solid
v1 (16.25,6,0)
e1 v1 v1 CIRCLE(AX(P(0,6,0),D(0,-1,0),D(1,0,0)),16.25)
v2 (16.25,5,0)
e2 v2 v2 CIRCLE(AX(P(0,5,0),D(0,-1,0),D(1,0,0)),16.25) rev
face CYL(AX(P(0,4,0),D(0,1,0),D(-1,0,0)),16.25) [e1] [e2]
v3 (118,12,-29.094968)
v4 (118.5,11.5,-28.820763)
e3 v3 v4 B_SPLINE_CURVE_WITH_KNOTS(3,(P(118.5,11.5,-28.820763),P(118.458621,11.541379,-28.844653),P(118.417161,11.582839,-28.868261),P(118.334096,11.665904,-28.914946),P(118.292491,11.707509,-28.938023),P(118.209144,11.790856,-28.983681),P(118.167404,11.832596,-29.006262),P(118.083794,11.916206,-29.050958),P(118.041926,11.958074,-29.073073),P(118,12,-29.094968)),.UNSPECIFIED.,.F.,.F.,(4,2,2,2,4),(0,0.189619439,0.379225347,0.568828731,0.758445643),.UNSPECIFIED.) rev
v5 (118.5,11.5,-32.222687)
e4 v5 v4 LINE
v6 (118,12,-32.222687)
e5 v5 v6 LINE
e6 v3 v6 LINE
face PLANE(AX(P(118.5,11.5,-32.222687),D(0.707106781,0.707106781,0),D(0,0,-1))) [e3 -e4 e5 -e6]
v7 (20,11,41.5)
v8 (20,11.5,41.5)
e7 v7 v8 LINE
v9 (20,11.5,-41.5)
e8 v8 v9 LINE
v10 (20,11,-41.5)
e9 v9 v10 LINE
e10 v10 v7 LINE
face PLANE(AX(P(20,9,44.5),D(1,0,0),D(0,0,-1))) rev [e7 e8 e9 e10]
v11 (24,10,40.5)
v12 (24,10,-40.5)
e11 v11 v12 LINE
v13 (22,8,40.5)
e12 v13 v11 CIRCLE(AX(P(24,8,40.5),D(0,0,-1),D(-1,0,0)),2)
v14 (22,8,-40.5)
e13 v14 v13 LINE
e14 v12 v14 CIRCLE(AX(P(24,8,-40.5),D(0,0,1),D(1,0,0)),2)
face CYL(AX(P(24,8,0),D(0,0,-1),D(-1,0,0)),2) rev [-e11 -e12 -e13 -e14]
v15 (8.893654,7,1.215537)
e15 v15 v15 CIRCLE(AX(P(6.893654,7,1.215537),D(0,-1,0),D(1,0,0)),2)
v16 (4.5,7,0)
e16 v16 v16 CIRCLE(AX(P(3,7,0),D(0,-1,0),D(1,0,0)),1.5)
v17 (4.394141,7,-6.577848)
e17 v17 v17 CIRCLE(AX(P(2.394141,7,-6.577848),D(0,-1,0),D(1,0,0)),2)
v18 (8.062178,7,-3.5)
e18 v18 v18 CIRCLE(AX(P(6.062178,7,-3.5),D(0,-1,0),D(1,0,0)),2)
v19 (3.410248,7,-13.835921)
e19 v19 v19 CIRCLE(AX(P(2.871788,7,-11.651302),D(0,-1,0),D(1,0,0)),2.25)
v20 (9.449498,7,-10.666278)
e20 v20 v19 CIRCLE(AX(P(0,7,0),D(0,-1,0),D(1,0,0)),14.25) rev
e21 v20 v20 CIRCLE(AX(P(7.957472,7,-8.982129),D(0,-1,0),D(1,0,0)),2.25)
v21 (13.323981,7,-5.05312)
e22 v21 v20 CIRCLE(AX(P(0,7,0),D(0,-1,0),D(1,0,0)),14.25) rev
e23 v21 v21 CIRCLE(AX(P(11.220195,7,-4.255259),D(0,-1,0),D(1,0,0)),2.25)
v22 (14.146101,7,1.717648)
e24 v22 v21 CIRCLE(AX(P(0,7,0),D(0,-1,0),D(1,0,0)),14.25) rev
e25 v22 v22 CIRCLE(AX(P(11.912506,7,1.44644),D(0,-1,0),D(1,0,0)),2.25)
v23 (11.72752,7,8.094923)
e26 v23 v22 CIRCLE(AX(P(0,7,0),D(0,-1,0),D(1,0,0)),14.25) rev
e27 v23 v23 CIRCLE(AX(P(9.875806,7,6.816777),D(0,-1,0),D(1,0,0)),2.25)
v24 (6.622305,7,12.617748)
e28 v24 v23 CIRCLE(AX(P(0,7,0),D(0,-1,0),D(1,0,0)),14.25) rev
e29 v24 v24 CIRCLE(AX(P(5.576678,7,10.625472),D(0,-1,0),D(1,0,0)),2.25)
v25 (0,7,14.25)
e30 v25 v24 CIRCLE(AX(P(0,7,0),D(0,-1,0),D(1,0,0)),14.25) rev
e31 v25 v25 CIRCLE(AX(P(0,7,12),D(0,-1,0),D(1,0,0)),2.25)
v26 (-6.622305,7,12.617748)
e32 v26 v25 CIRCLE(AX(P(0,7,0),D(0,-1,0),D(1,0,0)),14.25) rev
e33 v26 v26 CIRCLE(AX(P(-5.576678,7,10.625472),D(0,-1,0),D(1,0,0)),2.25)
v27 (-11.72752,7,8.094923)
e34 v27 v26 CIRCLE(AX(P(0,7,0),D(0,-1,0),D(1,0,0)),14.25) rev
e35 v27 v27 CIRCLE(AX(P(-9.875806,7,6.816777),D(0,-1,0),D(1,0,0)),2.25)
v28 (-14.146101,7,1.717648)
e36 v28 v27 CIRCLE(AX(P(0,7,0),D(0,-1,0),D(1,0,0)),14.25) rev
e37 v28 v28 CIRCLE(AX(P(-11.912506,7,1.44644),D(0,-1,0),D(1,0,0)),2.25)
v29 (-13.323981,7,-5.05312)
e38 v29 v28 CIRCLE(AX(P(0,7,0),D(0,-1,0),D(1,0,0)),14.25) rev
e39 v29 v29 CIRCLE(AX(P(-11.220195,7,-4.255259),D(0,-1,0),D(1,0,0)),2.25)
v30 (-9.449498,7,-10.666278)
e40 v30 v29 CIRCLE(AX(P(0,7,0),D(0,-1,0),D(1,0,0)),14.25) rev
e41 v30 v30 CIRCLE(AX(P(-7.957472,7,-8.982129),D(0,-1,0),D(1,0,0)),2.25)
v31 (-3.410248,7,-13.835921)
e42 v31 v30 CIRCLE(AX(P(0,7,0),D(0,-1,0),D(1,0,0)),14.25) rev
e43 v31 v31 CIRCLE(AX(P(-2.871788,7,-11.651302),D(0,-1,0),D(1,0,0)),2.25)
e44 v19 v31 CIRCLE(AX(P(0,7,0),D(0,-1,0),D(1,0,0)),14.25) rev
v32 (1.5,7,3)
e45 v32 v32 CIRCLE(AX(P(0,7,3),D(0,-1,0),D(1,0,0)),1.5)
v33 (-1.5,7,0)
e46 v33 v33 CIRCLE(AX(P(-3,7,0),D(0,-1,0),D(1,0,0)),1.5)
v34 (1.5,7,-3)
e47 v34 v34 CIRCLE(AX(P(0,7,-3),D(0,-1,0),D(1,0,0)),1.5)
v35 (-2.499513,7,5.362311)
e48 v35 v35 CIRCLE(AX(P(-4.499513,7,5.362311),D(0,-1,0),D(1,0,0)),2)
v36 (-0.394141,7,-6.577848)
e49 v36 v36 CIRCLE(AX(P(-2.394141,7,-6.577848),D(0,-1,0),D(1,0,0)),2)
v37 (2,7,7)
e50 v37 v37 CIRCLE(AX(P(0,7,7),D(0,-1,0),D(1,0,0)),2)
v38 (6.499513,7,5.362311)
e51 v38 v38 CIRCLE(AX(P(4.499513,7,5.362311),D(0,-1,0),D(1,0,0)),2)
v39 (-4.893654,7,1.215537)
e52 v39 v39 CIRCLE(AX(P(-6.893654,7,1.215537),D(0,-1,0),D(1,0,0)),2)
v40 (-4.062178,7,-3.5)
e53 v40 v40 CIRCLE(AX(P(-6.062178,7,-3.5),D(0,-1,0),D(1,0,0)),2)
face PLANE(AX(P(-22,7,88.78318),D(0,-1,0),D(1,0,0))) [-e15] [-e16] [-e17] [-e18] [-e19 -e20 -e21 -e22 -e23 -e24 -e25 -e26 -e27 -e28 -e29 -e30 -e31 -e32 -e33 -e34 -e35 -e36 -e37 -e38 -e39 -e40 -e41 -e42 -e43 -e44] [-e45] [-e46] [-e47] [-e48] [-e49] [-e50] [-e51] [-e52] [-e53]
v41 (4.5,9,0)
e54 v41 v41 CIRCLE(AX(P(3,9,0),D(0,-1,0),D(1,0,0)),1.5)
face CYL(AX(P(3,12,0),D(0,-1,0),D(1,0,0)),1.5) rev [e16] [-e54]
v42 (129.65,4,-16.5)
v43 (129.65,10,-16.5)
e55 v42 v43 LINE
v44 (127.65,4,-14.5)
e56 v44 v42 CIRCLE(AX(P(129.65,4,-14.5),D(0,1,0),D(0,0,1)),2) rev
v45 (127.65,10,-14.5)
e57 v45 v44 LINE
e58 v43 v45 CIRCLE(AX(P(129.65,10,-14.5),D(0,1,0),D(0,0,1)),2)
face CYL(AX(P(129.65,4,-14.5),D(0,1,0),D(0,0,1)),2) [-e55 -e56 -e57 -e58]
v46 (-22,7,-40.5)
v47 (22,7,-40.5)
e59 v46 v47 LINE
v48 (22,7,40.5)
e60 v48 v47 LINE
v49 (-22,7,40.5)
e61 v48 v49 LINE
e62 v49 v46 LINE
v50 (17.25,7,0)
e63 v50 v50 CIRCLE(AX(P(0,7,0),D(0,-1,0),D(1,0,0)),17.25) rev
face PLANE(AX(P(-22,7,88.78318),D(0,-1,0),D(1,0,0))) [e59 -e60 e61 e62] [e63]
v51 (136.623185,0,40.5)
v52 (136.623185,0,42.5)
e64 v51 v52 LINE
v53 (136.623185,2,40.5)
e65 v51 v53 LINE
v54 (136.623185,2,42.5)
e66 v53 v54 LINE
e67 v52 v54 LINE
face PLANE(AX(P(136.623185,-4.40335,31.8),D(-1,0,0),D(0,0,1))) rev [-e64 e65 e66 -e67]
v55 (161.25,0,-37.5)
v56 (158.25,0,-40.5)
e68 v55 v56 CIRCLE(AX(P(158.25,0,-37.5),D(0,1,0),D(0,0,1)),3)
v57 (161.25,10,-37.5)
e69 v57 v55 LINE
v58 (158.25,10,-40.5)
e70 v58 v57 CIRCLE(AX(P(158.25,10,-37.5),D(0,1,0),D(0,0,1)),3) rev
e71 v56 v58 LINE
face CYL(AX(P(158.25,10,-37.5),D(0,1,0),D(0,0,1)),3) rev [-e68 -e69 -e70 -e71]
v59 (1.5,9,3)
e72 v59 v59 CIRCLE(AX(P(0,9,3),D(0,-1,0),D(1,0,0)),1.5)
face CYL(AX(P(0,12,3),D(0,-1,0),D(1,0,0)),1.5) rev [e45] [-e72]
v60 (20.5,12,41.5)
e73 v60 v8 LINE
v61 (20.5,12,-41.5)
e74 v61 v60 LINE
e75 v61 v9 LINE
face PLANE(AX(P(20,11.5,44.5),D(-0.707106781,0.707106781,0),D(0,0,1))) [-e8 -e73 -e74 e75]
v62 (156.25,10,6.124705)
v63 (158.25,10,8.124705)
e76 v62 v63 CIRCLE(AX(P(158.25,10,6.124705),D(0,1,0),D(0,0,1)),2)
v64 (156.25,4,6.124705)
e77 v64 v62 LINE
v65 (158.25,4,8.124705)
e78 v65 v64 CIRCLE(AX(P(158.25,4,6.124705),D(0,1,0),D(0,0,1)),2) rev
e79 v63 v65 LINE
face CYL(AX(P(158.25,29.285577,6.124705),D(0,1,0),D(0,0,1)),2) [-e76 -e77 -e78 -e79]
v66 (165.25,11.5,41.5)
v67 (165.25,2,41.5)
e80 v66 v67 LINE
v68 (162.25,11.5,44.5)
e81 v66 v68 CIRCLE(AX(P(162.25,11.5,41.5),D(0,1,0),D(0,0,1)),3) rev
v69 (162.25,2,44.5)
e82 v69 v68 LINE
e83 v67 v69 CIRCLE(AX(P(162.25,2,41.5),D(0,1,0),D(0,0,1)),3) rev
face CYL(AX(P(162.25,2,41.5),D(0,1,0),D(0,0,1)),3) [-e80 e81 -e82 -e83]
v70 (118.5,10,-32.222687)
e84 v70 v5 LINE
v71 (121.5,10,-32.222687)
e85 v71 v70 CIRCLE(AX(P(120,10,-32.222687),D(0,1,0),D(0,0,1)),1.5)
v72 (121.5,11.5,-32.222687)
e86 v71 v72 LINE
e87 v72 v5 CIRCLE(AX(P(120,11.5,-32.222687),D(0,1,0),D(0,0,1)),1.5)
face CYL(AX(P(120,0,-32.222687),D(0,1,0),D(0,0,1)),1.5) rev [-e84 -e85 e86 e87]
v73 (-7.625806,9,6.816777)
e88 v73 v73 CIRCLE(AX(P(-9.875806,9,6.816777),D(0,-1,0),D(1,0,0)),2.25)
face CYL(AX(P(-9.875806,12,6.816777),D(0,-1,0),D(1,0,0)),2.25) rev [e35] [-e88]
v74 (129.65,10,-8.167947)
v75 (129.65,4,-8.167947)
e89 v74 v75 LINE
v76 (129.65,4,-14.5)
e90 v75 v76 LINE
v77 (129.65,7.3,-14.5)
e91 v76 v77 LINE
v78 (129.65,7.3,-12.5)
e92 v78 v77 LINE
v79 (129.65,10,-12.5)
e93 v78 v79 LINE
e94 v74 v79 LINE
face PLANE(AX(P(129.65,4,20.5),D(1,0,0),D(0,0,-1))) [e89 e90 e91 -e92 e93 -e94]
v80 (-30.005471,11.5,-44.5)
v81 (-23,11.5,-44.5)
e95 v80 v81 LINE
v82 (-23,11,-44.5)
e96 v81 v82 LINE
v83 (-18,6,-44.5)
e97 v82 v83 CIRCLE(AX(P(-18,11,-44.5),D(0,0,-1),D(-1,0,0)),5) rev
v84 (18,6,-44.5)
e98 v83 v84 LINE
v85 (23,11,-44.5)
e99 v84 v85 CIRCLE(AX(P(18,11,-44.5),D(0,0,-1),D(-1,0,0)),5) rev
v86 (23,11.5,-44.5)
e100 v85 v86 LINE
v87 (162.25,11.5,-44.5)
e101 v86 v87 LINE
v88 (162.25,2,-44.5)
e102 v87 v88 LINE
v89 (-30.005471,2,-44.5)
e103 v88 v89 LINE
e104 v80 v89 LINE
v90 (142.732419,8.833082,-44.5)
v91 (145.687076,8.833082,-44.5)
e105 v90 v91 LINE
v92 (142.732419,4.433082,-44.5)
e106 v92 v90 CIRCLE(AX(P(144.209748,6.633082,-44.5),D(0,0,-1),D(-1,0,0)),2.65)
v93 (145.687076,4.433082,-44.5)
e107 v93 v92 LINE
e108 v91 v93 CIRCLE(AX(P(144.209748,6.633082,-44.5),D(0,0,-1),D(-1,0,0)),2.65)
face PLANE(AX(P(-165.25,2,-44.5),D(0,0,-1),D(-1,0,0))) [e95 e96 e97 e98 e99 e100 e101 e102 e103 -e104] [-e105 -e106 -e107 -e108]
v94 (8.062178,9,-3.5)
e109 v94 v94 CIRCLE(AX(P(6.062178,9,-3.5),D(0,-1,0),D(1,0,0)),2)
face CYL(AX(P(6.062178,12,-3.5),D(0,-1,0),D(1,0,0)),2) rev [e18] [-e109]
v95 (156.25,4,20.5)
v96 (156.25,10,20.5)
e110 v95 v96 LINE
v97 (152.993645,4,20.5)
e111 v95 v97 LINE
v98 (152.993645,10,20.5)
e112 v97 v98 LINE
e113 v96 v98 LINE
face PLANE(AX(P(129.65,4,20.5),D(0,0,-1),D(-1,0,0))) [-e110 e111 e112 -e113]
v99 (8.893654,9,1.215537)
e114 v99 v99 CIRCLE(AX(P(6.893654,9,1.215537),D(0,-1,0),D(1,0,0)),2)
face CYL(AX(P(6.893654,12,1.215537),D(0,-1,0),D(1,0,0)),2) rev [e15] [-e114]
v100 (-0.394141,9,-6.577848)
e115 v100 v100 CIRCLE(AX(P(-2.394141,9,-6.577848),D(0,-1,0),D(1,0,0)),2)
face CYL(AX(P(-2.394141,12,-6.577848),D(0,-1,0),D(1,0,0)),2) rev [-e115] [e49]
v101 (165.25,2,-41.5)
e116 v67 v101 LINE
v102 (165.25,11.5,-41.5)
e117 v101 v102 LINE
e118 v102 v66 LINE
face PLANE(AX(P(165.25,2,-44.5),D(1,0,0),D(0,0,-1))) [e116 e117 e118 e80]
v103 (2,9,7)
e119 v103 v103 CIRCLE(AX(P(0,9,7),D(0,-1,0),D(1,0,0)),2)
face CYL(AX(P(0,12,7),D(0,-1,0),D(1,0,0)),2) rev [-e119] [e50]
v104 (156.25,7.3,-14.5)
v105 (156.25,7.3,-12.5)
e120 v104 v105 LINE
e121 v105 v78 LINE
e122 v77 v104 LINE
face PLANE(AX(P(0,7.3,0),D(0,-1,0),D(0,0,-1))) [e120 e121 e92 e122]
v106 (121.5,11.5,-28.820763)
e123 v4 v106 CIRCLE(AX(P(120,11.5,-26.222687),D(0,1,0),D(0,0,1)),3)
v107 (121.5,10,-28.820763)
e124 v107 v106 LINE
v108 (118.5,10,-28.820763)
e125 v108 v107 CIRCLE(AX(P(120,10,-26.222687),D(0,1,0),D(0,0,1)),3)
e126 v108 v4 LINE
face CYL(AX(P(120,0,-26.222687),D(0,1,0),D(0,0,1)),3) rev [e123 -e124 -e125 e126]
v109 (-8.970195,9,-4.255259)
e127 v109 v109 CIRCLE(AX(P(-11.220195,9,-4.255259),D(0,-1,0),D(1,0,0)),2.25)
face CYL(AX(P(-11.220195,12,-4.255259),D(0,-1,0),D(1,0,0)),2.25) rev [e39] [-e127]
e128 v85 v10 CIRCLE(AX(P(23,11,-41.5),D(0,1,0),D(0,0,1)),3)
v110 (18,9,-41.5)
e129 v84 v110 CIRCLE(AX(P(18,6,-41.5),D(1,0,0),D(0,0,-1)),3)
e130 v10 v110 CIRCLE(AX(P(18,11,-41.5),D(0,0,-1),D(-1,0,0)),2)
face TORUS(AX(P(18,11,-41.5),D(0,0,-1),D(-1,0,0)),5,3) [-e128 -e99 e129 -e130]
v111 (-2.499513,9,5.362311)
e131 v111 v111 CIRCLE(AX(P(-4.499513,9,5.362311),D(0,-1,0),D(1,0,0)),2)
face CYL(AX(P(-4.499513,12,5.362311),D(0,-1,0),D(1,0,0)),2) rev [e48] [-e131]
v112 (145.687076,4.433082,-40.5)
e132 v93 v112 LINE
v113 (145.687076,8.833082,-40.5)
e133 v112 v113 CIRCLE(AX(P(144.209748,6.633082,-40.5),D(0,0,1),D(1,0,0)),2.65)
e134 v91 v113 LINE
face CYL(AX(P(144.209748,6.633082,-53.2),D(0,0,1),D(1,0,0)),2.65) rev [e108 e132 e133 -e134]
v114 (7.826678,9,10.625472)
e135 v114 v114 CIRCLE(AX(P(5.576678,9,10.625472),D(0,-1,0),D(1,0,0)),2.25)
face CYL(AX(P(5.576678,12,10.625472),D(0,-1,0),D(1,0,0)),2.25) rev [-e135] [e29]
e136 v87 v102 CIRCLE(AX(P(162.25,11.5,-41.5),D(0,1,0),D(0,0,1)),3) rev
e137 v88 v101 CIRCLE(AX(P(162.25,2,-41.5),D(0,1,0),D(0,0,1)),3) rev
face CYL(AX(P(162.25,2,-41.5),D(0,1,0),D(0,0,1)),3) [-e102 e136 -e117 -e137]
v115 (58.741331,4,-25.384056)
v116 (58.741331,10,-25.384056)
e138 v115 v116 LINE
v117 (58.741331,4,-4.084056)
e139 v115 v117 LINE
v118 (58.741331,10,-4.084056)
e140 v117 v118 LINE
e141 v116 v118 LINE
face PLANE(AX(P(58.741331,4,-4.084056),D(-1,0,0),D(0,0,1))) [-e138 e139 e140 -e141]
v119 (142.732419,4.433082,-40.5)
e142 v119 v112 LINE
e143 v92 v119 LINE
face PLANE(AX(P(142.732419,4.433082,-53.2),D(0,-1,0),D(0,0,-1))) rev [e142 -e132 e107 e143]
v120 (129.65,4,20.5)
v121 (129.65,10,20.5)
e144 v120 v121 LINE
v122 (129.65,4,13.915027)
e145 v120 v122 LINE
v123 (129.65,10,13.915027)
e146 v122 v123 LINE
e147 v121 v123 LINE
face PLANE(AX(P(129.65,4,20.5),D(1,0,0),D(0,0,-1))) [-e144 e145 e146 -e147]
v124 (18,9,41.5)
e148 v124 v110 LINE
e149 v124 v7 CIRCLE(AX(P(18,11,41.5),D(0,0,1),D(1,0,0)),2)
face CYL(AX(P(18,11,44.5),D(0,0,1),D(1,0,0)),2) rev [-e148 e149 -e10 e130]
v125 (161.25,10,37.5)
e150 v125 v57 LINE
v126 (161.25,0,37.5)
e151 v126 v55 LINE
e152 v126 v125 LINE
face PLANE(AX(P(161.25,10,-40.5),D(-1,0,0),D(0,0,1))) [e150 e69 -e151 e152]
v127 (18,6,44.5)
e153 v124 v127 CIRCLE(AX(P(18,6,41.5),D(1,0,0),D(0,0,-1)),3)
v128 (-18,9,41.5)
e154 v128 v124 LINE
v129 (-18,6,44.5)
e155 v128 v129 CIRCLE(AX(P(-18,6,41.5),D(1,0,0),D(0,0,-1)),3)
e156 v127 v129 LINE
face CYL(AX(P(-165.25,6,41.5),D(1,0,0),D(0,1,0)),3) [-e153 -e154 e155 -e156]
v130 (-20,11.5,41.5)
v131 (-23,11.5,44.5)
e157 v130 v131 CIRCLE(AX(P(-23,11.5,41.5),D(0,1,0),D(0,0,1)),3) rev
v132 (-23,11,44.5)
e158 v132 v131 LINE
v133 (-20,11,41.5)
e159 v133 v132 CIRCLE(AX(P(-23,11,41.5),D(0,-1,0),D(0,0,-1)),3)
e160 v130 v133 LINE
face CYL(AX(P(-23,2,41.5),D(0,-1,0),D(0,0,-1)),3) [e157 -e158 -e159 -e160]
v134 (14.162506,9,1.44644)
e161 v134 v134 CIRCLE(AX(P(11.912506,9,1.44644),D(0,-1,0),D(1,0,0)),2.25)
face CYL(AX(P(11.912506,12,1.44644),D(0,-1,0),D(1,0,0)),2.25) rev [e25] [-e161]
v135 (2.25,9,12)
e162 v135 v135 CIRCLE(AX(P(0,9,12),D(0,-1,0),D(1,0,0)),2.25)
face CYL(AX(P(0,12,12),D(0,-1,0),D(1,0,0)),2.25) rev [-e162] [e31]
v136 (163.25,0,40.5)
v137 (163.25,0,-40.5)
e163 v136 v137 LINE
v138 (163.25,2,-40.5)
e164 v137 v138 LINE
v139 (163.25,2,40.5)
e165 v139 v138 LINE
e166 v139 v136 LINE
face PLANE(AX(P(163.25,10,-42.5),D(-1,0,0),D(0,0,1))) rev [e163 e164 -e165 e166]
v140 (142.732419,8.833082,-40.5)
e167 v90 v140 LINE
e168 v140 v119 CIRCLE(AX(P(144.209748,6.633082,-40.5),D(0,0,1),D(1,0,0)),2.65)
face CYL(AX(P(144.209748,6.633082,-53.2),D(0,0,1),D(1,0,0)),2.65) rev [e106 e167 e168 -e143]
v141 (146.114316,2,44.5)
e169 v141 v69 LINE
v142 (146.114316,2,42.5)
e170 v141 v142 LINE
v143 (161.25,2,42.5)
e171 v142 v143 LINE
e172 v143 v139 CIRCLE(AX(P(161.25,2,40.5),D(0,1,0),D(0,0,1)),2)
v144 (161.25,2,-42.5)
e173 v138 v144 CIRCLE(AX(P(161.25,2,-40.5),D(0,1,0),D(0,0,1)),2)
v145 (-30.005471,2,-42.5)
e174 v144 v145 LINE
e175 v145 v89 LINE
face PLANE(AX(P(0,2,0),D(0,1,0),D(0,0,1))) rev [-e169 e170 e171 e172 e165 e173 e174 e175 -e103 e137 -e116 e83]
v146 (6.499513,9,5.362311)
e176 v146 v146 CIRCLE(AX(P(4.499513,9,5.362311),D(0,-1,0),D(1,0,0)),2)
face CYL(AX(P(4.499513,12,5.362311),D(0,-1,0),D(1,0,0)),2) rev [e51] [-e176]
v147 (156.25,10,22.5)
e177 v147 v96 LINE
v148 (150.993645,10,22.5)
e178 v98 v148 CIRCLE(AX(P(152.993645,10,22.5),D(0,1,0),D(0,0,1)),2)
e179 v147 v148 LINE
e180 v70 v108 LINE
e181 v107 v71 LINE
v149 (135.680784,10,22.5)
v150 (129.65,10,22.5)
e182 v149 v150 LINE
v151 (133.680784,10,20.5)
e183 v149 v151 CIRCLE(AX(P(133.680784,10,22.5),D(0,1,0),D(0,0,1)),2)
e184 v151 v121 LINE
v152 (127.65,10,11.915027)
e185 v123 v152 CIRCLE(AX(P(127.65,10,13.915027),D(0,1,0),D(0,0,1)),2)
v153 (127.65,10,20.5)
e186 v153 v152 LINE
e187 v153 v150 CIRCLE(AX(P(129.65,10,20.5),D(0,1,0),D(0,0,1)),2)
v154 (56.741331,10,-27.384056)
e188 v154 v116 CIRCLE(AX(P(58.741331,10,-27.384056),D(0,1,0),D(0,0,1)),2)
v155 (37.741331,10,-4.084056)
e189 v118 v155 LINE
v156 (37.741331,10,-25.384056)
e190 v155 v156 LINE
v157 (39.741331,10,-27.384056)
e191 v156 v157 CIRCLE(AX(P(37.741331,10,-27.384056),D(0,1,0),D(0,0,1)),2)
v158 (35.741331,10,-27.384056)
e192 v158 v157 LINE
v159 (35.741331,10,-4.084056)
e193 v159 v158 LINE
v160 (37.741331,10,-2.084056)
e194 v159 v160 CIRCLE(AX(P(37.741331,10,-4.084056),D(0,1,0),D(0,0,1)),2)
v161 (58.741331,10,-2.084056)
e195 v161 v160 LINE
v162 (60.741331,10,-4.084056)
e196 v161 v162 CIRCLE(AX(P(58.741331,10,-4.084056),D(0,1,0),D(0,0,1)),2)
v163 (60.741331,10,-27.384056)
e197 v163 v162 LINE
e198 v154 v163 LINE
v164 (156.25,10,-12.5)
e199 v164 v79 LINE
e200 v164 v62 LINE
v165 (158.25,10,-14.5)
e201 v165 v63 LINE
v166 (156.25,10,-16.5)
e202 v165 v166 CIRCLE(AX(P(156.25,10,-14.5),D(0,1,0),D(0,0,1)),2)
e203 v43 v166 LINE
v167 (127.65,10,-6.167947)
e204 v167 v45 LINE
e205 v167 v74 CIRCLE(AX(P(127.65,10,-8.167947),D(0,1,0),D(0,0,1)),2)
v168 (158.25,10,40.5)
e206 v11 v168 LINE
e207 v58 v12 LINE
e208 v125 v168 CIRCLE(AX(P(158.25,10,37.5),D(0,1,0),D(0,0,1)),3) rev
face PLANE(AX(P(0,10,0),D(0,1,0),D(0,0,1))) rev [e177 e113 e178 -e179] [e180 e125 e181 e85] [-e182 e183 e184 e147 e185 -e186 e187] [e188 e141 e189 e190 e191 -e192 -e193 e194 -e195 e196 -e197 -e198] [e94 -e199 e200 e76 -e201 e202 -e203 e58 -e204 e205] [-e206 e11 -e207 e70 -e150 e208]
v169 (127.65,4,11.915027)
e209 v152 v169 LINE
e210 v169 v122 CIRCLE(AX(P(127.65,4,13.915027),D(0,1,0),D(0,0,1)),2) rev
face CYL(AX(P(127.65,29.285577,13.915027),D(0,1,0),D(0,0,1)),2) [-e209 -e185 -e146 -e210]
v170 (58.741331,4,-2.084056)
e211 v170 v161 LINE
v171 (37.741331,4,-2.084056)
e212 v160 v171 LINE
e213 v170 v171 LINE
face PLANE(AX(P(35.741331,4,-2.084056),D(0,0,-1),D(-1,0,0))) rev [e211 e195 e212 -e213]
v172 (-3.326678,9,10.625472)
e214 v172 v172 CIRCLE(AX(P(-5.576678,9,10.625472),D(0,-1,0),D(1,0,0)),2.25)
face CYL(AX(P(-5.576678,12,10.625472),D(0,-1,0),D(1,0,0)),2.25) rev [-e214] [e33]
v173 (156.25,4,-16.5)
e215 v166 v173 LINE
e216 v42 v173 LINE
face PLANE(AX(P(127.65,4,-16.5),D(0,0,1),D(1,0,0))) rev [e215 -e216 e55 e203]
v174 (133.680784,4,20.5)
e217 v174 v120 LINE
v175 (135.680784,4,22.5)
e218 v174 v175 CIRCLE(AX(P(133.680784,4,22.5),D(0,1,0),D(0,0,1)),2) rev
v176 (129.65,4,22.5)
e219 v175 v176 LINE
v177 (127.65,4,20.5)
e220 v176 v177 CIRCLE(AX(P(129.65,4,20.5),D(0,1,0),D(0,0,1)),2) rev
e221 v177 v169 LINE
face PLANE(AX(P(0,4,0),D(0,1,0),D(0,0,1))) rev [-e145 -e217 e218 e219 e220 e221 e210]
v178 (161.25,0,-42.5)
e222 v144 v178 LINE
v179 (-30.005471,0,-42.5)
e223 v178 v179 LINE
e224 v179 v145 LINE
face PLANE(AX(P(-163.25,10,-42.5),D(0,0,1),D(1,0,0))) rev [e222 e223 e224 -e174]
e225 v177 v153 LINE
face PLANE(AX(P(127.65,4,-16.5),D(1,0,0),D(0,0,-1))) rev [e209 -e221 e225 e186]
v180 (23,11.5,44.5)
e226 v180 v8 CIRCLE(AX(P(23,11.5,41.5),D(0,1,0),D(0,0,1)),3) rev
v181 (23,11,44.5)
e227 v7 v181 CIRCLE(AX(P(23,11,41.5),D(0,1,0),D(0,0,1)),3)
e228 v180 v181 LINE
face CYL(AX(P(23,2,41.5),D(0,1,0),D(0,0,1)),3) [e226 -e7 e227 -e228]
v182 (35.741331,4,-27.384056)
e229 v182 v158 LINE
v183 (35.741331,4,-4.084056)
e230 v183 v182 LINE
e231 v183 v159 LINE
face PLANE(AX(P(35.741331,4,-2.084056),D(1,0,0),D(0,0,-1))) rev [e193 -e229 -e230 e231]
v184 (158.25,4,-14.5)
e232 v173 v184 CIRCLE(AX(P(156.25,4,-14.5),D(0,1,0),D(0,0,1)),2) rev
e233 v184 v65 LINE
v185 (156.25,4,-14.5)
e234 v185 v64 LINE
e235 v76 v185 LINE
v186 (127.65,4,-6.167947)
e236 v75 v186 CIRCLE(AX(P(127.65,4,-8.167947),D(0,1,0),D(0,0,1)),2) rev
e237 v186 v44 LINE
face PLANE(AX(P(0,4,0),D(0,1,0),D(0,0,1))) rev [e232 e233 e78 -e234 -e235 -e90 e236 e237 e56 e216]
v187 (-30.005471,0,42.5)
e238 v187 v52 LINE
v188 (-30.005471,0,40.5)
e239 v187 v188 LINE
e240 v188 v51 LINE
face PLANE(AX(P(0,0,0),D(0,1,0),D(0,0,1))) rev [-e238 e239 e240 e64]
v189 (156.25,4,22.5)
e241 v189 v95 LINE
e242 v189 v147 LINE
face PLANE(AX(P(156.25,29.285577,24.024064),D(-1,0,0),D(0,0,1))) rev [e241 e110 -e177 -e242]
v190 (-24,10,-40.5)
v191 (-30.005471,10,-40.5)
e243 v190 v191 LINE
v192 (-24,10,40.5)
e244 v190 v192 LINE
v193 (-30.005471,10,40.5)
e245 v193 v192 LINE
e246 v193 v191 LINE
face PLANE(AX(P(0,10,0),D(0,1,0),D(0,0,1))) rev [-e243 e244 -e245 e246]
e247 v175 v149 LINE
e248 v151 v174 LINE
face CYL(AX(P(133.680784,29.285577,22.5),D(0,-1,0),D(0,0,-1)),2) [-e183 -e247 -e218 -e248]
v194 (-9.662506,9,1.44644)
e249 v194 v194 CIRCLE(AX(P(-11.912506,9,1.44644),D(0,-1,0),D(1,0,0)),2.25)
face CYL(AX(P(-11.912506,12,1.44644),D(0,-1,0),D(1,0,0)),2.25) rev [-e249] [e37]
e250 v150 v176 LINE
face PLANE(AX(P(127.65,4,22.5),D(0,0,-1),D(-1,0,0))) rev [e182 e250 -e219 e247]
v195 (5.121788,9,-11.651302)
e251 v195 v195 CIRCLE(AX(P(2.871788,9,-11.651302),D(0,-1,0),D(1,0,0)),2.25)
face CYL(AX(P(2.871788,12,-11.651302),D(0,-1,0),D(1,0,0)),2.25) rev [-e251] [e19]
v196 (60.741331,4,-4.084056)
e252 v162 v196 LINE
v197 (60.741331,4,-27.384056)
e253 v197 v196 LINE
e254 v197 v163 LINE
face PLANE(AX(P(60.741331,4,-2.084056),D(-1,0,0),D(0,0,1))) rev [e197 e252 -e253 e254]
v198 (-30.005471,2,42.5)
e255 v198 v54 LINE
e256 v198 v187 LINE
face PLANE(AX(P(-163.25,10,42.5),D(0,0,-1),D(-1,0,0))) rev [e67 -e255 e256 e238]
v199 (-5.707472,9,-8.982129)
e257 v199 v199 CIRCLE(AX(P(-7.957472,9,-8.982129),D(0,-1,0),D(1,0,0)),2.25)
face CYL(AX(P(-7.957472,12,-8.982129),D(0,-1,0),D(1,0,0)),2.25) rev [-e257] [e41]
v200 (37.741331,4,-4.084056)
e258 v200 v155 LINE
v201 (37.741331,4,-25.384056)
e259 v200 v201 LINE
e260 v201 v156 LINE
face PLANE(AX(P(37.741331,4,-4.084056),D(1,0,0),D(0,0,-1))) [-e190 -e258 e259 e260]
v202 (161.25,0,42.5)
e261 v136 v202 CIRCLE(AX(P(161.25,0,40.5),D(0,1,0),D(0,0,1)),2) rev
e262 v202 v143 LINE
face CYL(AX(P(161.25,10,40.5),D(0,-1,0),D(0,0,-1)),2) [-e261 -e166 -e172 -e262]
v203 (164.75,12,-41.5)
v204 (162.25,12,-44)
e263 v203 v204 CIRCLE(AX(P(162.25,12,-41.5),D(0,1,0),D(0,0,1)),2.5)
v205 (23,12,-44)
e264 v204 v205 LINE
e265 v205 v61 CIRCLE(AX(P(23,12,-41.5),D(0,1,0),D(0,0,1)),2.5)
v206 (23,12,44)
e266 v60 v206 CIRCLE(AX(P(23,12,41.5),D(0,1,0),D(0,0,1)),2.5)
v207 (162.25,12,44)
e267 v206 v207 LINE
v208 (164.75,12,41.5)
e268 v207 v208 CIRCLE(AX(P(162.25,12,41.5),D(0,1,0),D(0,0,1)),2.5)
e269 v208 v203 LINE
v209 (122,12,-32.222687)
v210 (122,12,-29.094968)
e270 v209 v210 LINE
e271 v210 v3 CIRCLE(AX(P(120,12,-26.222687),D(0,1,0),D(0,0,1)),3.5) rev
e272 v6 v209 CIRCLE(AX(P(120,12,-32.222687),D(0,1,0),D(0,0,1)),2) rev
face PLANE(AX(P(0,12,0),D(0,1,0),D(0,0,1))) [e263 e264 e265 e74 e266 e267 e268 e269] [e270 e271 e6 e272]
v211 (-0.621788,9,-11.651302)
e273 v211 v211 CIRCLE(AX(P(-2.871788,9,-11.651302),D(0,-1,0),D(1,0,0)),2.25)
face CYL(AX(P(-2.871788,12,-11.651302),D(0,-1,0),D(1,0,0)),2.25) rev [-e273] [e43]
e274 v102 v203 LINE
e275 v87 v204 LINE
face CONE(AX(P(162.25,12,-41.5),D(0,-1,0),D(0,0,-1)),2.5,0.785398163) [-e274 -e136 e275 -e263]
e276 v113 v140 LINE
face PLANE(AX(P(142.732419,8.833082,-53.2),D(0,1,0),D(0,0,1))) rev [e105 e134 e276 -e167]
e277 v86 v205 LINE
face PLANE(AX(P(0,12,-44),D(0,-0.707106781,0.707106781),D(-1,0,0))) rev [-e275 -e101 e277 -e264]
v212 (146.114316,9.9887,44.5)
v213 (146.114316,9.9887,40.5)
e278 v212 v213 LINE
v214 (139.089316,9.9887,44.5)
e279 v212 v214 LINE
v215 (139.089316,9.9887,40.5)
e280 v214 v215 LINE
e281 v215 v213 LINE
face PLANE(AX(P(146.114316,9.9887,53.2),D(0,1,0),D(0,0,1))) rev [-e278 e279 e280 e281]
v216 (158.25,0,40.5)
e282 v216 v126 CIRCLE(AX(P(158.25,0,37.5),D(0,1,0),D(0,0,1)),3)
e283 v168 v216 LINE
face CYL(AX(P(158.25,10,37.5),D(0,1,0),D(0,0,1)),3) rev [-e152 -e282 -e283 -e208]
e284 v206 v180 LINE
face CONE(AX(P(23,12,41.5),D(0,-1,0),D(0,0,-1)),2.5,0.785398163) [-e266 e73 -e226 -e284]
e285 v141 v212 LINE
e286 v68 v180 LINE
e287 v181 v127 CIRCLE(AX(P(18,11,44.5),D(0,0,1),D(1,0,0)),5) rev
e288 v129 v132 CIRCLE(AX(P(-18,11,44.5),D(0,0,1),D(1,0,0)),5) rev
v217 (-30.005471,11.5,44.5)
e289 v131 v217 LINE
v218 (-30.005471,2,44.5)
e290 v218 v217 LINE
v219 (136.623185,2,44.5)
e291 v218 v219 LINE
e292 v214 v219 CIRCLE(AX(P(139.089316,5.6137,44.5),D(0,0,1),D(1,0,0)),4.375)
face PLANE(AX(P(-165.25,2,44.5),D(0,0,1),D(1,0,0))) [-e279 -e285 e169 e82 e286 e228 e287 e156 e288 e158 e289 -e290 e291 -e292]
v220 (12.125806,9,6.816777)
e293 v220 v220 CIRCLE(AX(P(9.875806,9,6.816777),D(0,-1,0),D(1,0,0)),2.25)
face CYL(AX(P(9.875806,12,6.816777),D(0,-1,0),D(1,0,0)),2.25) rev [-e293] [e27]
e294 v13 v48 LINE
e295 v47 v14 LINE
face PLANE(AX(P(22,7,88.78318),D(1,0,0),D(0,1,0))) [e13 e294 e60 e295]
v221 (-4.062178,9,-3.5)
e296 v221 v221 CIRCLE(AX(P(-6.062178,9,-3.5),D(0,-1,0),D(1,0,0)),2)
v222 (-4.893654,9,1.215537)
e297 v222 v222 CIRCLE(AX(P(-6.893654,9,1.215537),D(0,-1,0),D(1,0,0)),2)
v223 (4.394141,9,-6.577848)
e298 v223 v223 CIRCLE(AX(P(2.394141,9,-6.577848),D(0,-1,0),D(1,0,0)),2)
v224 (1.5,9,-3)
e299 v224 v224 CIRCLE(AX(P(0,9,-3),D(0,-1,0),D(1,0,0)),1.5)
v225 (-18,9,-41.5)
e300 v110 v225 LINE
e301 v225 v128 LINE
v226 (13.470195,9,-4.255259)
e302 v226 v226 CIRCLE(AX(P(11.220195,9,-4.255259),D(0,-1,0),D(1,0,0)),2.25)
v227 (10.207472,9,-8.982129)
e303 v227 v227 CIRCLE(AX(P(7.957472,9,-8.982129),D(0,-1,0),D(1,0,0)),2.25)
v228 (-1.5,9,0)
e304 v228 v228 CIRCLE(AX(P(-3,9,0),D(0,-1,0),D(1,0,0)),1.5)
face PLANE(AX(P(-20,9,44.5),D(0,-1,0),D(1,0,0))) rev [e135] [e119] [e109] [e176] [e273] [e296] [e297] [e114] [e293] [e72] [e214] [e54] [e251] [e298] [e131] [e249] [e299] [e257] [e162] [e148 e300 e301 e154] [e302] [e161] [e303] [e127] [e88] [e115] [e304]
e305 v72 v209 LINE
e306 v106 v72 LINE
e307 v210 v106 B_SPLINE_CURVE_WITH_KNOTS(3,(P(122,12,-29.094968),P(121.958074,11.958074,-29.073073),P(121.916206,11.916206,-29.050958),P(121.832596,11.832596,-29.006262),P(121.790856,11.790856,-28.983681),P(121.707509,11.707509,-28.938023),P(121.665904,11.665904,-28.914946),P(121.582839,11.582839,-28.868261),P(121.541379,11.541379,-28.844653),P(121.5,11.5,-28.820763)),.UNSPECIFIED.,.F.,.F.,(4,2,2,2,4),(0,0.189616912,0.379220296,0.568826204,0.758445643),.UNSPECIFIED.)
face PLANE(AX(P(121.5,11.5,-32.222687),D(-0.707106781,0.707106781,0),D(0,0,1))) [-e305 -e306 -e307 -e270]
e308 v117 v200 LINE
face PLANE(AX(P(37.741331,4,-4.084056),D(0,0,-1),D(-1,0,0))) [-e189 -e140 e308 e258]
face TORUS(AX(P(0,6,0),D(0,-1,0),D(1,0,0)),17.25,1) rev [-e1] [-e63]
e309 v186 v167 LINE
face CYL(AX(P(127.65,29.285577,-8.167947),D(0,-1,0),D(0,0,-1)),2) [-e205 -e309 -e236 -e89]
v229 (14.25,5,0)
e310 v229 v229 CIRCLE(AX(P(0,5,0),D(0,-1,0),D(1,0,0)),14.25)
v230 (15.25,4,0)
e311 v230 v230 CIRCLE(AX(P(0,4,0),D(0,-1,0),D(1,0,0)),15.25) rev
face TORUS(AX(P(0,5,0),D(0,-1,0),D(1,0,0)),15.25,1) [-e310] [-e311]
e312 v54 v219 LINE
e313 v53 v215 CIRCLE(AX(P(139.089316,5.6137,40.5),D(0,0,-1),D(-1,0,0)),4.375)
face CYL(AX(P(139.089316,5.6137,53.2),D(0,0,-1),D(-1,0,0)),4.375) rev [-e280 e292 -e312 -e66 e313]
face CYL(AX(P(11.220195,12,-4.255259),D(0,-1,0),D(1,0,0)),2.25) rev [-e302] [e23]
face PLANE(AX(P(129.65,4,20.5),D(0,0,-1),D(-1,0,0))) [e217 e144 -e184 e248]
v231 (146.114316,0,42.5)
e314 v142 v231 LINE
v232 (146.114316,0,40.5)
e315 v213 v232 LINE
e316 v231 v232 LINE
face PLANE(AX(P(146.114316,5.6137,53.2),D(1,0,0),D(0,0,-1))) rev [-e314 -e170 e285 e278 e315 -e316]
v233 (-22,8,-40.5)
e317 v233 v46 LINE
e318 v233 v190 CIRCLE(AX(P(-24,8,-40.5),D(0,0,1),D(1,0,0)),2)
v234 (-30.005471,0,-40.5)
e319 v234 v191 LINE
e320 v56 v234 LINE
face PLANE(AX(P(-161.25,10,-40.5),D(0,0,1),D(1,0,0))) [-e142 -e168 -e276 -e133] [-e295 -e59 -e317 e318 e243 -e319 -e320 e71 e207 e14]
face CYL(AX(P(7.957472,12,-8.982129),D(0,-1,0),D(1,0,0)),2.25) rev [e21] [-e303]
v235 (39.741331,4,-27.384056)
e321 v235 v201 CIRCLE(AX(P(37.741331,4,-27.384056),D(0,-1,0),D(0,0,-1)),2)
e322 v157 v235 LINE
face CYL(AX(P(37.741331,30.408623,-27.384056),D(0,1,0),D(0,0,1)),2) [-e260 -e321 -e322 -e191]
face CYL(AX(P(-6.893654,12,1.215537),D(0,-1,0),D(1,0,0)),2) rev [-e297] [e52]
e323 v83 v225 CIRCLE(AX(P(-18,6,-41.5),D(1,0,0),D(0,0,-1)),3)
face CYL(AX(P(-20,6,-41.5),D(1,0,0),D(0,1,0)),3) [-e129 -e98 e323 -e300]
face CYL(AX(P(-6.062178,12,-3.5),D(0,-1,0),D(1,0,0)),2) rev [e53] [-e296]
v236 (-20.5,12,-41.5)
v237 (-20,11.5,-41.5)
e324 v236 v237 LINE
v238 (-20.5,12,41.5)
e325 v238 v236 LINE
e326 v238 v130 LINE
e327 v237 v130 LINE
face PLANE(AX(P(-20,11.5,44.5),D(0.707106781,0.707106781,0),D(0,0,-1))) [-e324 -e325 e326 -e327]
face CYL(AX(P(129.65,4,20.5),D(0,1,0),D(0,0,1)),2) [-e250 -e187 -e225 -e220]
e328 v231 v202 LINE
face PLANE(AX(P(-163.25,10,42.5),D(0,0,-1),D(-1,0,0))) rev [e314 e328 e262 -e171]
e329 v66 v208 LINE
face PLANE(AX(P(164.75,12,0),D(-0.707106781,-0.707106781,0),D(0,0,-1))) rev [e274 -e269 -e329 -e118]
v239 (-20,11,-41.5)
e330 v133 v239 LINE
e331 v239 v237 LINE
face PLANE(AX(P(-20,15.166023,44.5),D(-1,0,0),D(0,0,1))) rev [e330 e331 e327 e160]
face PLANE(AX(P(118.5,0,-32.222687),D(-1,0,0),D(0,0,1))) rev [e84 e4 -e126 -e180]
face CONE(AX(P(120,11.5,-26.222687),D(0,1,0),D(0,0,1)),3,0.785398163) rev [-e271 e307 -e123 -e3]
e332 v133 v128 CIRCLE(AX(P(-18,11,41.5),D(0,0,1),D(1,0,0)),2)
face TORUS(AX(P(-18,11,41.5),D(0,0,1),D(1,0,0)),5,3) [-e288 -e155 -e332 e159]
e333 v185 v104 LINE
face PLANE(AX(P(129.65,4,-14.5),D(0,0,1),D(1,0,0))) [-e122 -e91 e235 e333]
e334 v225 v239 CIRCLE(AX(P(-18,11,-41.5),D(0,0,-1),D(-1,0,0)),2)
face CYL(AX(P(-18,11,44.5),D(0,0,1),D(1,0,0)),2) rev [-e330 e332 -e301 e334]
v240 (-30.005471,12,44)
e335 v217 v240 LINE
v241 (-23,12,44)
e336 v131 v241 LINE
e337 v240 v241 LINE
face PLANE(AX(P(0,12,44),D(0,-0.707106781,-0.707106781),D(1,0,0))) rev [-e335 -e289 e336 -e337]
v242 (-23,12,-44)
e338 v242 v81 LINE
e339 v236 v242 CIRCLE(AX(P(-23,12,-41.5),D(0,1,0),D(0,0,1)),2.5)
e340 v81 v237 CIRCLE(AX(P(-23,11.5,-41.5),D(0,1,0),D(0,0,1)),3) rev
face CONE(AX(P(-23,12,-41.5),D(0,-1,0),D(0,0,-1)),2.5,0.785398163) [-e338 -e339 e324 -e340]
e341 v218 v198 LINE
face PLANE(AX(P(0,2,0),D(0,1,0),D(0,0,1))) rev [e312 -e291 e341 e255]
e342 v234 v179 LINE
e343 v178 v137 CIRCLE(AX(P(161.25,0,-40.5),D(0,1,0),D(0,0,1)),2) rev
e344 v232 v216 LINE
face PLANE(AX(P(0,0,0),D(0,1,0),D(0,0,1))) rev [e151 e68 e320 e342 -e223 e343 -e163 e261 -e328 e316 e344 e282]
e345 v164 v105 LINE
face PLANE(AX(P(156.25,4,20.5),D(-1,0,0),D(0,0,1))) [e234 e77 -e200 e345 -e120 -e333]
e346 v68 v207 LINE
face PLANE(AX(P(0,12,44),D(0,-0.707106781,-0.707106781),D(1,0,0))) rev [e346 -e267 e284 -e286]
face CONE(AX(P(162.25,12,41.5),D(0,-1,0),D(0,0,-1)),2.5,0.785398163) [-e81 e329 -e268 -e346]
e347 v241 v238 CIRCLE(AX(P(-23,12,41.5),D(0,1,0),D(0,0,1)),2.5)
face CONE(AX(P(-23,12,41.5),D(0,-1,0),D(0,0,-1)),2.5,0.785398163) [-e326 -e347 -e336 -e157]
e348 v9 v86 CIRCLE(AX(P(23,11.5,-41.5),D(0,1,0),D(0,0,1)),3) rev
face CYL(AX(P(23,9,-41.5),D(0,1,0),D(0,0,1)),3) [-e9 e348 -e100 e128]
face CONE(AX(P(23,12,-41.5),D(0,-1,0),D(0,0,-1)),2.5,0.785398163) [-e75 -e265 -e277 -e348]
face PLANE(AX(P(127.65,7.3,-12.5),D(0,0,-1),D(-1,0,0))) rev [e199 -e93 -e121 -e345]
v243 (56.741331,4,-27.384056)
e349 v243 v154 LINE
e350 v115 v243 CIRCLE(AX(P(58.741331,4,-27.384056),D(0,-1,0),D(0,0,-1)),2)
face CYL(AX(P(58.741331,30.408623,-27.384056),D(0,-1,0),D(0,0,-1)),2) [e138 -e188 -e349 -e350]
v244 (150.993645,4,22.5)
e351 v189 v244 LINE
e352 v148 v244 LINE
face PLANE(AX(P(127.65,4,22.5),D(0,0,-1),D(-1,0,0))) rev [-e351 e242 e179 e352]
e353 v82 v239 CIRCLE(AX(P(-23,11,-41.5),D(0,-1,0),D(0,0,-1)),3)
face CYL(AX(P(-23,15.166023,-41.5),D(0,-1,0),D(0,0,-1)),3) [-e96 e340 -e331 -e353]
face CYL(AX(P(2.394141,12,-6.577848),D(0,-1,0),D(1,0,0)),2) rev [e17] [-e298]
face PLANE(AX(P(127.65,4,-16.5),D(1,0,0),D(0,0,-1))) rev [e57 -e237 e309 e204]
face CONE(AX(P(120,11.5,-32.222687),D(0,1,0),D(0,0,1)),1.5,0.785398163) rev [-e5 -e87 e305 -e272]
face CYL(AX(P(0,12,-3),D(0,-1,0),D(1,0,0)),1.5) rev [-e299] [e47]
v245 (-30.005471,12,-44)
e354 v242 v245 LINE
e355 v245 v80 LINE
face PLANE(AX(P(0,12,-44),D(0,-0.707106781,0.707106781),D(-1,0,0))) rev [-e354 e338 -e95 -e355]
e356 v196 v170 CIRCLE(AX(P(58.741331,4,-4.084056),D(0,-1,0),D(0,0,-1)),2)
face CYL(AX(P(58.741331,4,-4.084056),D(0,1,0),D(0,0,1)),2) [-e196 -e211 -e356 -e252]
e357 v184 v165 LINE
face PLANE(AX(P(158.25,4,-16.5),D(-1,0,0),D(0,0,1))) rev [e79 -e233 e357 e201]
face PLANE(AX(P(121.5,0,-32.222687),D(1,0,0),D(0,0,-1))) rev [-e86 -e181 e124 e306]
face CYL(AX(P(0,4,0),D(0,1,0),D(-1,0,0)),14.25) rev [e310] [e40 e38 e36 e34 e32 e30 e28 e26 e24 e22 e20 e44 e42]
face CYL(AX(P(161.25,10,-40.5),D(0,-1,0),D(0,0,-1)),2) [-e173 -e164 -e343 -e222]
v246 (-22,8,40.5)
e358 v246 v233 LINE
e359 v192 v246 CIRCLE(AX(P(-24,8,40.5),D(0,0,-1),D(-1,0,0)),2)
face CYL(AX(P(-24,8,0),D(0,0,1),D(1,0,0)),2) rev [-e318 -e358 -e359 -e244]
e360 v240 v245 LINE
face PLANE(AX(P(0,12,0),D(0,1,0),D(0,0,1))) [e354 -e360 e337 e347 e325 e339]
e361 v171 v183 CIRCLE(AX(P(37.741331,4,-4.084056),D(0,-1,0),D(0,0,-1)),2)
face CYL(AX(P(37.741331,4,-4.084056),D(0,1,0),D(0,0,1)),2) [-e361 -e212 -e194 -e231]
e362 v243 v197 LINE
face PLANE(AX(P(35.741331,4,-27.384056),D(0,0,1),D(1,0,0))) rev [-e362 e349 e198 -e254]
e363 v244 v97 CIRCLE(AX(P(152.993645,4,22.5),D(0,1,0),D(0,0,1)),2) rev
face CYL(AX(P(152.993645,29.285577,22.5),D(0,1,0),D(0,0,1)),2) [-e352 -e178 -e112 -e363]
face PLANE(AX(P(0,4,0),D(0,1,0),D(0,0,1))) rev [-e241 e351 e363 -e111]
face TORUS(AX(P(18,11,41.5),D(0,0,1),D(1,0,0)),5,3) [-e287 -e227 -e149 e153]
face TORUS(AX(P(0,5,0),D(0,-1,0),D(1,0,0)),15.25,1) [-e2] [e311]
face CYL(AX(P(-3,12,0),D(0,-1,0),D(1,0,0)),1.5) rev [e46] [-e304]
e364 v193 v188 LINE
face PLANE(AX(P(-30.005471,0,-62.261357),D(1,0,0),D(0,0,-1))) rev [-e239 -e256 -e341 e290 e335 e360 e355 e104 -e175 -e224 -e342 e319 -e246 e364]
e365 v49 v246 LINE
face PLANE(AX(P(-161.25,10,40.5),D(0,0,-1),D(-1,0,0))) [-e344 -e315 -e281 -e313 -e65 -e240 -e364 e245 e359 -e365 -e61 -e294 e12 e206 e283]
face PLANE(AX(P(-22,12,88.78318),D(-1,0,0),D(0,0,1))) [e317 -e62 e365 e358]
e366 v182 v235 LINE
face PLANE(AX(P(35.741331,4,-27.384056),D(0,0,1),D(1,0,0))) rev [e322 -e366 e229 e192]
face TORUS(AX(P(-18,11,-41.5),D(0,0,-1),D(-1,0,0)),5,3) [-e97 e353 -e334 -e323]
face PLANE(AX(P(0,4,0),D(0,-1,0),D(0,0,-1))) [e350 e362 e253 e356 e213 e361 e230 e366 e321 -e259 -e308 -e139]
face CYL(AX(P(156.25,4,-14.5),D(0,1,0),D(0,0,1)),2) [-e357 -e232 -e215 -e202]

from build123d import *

# Parameters (mm, degrees)
SKETCH1_W           = 326.5
SKETCH1_H           = 85
SKETCH1_W_2         = 322.5
SKETCH1_H_2         = 81
BOSS_EXTRUDE1_DEPTH = 10
SKETCH2_W           = 330.5
SKETCH2_H           = 89
SKETCH2_W_2         = 322.5
SKETCH2_H_2         = 81
BOSS_EXTRUDE2_DEPTH = 8
SKETCH3_W           = 330.5
SKETCH3_H           = 89
BOSS_EXTRUDE3_DEPTH = 2
FILLET1_R           = 3
FILLET2_R           = 2
FILLET3_R           = 3
CHAMFER1_SIZE       = 0.5
CUT_EXTRUDE1_DEPTH  = 172.557024047
CHAMFER2_SIZE       = 0.5
SKETCH7_W           = 40
SKETCH7_H           = 6.166023439
CUT_EXTRUDE3_DEPTH  = 189.075948755
BOSS_EXTRUDE4_REACH = 190.076
FILLET4_R           = 2
CHAMFER3_SIZE       = 0.5
FILLET5_R           = 3
FILLET6_R           = 2
SKETCH9_R           = 16.25
SKETCH9_R_2         = 14.25
BOSS_EXTRUDE5_DEPTH = 3
SKETCH10_R          = 1.5
SKETCH10_R_2        = 2
SKETCH10_R_3        = 2.25
CUT_EXTRUDE4_DEPTH  = 172.279924393
CHAMFER4_SIZE       = 0.5
SKETCH12_W          = 30.6
SKETCH12_H          = 39
SKETCH12_W_2        = 26.6
SKETCH12_H_2        = 35
BOSS_EXTRUDE6_DEPTH = 6
SKETCH13_W          = 30.6
SKETCH13_H          = 4
BOSS_EXTRUDE7_DEPTH = 2.7
SKETCH14_W          = 3.373769955
SKETCH14_H          = 15.899358316
SKETCH14_W_2        = 15.312861043
SKETCH14_H_2        = 6.106571476
SKETCH14_W_3        = 6.70369678
SKETCH14_H_3        = 18.082973575
CUT_EXTRUDE5_DEPTH  = 6
FILLET7_R           = 2
CUT_EXTRUDE6_DEPTH  = 12.7
CUT_EXTRUDE7_DEPTH  = 12.7
CUT_EXTRUDE8_DEPTH  = 12.7
SKETCH19_W          = 25
SKETCH19_H          = 25.3
SKETCH19_W_2        = 21
SKETCH19_H_2        = 21.3
BOSS_EXTRUDE8_DEPTH = 6
SKETCH20_W          = 17
SKETCH20_H          = 11.292116592
CUT_EXTRUDE9_DEPTH  = 6
FILLET8_R           = 2
FILLET9_R           = 2
FILLET10_R          = 1
SKETCH18_W          = 146.063438611
SKETCH18_H          = 131.716143141
CUT_EXTRUDE10_DEPTH = 172.557024047


with BuildPart() as part:
    # Sketch1 → Boss-Extrude1 (new body)
    with BuildSketch(Plane(origin=(0, 0, 0), x_dir=(1, 0, 0), z_dir=(0, 1, 0))):
        Rectangle(SKETCH1_W, SKETCH1_H)
        Rectangle(SKETCH1_W_2, SKETCH1_H_2, mode=Mode.SUBTRACT)
    extrude(amount=BOSS_EXTRUDE1_DEPTH)

    # Sketch2 → Boss-Extrude2 (add)
    with BuildSketch(Plane(origin=(0, 10, 0), x_dir=(1, 0, 0), z_dir=(0, 1, 0))):
        Rectangle(SKETCH2_W, SKETCH2_H)
        Rectangle(SKETCH2_W_2, SKETCH2_H_2, mode=Mode.SUBTRACT)
    extrude(amount=-BOSS_EXTRUDE2_DEPTH)

    # Sketch3 → Boss-Extrude3 (add)
    with BuildSketch(Plane(origin=(0, 10, 0), x_dir=(1, 0, 0), z_dir=(0, 1, 0))):
        Rectangle(SKETCH3_W, SKETCH3_H)
    extrude(amount=BOSS_EXTRUDE3_DEPTH)

    # Fillet1
    fillet1_edges = [part.edges().sort_by_distance(p)[0] for p in [
        (161.25, 5, 40.5),
        (161.25, 5, -40.5),
        (-161.25, 5, -40.5),
        (-161.25, 5, 40.5),
    ]]
    fillet(fillet1_edges, radius=FILLET1_R)

    # Fillet2
    fillet2_edges = [part.edges().sort_by_distance(p)[0] for p in [
        (163.25, 1, 42.5),
        (-163.25, 1, 42.5),
        (-163.25, 1, -42.5),
        (163.25, 1, -42.5),
    ]]
    fillet(fillet2_edges, radius=FILLET2_R)

    # Fillet3
    fillet3_edges = [part.edges().sort_by_distance(p)[0] for p in [
        (165.25, 7, -44.5),
        (165.25, 7, 44.5),
        (-165.25, 7, 44.5),
        (-165.25, 7, -44.5),
    ]]
    fillet(fillet3_edges, radius=FILLET3_R)

    # Chamfer1
    chamfer1_edges = [part.edges().sort_by_distance(p)[0] for p in [
        (165.25, 12, 0),
        (-165.25, 12, 0),
        (0, 12, 44.5),
        (0, 12, -44.5),
        (-164.371320344, 12, -43.621320344),
        (-164.371320344, 12, 43.621320344),
        (164.371320344, 12, 43.621320344),
        (164.371320344, 12, -43.621320344),
    ]]
    chamfer(chamfer1_edges, length=CHAMFER1_SIZE)

    # Sketch4 → Cut-Extrude1 (cut, through all)
    with BuildSketch(Plane(origin=(0, 12, 0), x_dir=(1, 0, 0), z_dir=(0, 1, 0))):
        with BuildLine():
            Line((-121.5, 32.222687085), (-121.5, 28.820763297))
            ThreePointArc((-121.5, 28.820763297), (-120, 23.222687085), (-118.5, 28.820763297))
            Line((-118.5, 28.820763297), (-118.5, 32.222687085))
            ThreePointArc((-118.5, 32.222687085), (-120, 33.722687085), (-121.5, 32.222687085))
        make_face()
        with BuildLine():
            Line((118.5, 32.222687085), (118.5, 28.820763297))
            ThreePointArc((118.5, 28.820763297), (120, 23.222687085), (121.5, 28.820763297))
            Line((121.5, 28.820763297), (121.5, 32.222687085))
            ThreePointArc((121.5, 32.222687085), (120, 33.722687085), (118.5, 32.222687085))
        make_face()
    extrude(amount=-CUT_EXTRUDE1_DEPTH, mode=Mode.SUBTRACT)

    # Chamfer2
    chamfer2_edges = [part.edges().sort_by_distance(p)[0] for p in [
        (-120, 12, -33.722687085),
        (-121.5, 12, -30.521725191),
        (-120, 12, -23.222687085),
        (-118.5, 12, -30.521725191),
        (120, 12, -33.722687085),
        (118.5, 12, -30.521725191),
        (120, 12, -23.222687085),
        (121.5, 12, -30.521725191),
    ]]
    chamfer(chamfer2_edges, length=CHAMFER2_SIZE)

    # Sketch7 → Cut-Extrude3 (cut, through all)
    with BuildSketch(Plane(origin=(0, 0, -44.5), x_dir=(-1, 0, 0), z_dir=(0, 0, -1))):
        with Locations((0, 12.083011719)):
            Rectangle(SKETCH7_W, SKETCH7_H)
    extrude(amount=-CUT_EXTRUDE3_DEPTH, mode=Mode.SUBTRACT)

    # Boss-Extrude4: up to this face of the body (flat: up to its plane)
    boss_extrude4_end = Plane(part.part.faces().sort_by_distance((0, 6.63265862, 44.5))[0])
    # Sketch8 → Boss-Extrude4 (add, up to the picked face)
    with BuildSketch(Plane(origin=(0, 0, -44.5), x_dir=(-1, 0, 0), z_dir=(0, 0, -1)), mode=Mode.PRIVATE) as boss_extrude4_sk1:
        Polygon((-20, 12), (-20, 9), (20, 9), (20, 12), (22, 12), (22, 7), (-22, 7), (-22, 12), align=None)
    boss_extrude4_tool1 = split(extrude(boss_extrude4_sk1.sketch, amount=-BOSS_EXTRUDE4_REACH, mode=Mode.PRIVATE), bisect_by=boss_extrude4_end, keep=Keep.BOTH, mode=Mode.PRIVATE)
    add(boss_extrude4_tool1.solids().sort_by(Axis((0, 8.3, -44.5), (0, 0, 1)))[0])

    # Fillet4
    fillet4_edges = [part.edges().sort_by_distance(p)[0] for p in [
        (-20, 9, 0),
        (20, 9, 0),
    ]]
    fillet(fillet4_edges, radius=FILLET4_R)

    # Chamfer3
    chamfer3_edges = [part.edges().sort_by_distance(p)[0] for p in [
        (-21, 12, 44.5),
        (21, 12, 44.5),
        (-21, 12, -44.5),
        (21, 12, -44.5),
    ]]
    chamfer(chamfer3_edges, length=CHAMFER3_SIZE - 0.0001)  # a hair under: the kernel refuses the full size

    # Fillet5
    fillet5_edges = [part.edges().sort_by_distance(p)[0] for p in [
        (20, 11.25005, 44.5),
        (19.414213562, 9.585786438, 44.5),
        (-20, 11.25005, 44.5),
        (-19.414213562, 9.585786438, 44.5),
        (20, 11.25005, -44.5),
        (19.414213562, 9.585786438, -44.5),
        (-20, 11.25005, -44.5),
        (-19.414213562, 9.585786438, -44.5),
        (0, 9, -44.5),
        (0, 9, 44.5),
    ]]
    fillet(fillet5_edges, radius=FILLET5_R)

    # Fillet6
    fillet6_edges = [part.edges().sort_by_distance(p)[0] for p in [
        (22, 10, 0),
        (-22, 10, 0),
    ]]
    fillet(fillet6_edges, radius=FILLET6_R)

    # Sketch9 → Boss-Extrude5 (add)
    with BuildSketch(Plane.XZ.offset(-7)):
        Circle(SKETCH9_R)
        Circle(SKETCH9_R_2, mode=Mode.SUBTRACT)
    extrude(amount=BOSS_EXTRUDE5_DEPTH)

    # Sketch10 → Cut-Extrude4 (cut, through all)
    with BuildSketch(Plane.XZ.offset(-7)):
        with Locations((0, 3)):
            Circle(SKETCH10_R)
        with Locations((0, 7)):
            Circle(SKETCH10_R_2)
        with Locations((0, 12)):
            Circle(SKETCH10_R_3)
        with Locations((4.499513268, 5.362311102)):
            Circle(SKETCH10_R_2)
        with Locations((6.893654271, 1.215537244)):
            Circle(SKETCH10_R_2)
        with Locations((6.062177826, -3.5)):
            Circle(SKETCH10_R_2)
        with Locations((2.394141003, -6.577848346)):
            Circle(SKETCH10_R_2)
        with Locations((-2.394141003, -6.577848346)):
            Circle(SKETCH10_R_2)
        with Locations((-6.062177826, -3.5)):
            Circle(SKETCH10_R_2)
        with Locations((-6.893654271, 1.215537244)):
            Circle(SKETCH10_R_2)
        with Locations((-4.499513268, 5.362311102)):
            Circle(SKETCH10_R_2)
        with Locations((3, 0)):
            Circle(SKETCH10_R)
        with Locations((0, -3)):
            Circle(SKETCH10_R)
        with Locations((-3, 0)):
            Circle(SKETCH10_R)
        with Locations((5.576678065, 10.625472308)):
            Circle(SKETCH10_R_3)
        with Locations((9.875806391, 6.816776961)):
            Circle(SKETCH10_R_3)
        with Locations((11.912506489, 1.446440163)):
            Circle(SKETCH10_R_3)
        with Locations((11.220194912, -4.255258645)):
            Circle(SKETCH10_R_3)
        with Locations((7.957471899, -8.982128978)):
            Circle(SKETCH10_R_3)
        with Locations((2.871787971, -11.651301809)):
            Circle(SKETCH10_R_3)
        with Locations((-2.871787971, -11.651301809)):
            Circle(SKETCH10_R_3)
        with Locations((-7.957471899, -8.982128978)):
            Circle(SKETCH10_R_3)
        with Locations((-11.220194912, -4.255258645)):
            Circle(SKETCH10_R_3)
        with Locations((-11.912506489, 1.446440163)):
            Circle(SKETCH10_R_3)
        with Locations((-9.875806391, 6.816776961)):
            Circle(SKETCH10_R_3)
        with Locations((-5.576678065, 10.625472308)):
            Circle(SKETCH10_R_3)
    extrude(amount=-CUT_EXTRUDE4_DEPTH, mode=Mode.SUBTRACT)

    # Chamfer4
    chamfer4_edges = [part.edges().sort_by_distance(p)[0] for p in [
        (-20.35666074, 12, -42.918716869),
        (-20.35666074, 12, 42.918716869),
        (-20, 12, 0),
        (20.35666074, 12, 42.918716869),
        (20.35666074, 12, -42.918716869),
        (20, 12, 0),
    ]]
    chamfer(chamfer4_edges, length=CHAMFER4_SIZE - 0.0001)  # a hair under: the kernel refuses the full size

    # Sketch12 → Boss-Extrude6 (add)
    with BuildSketch(Plane.XZ.offset(-10)):
        with Locations((142.95, 3)):
            Rectangle(SKETCH12_W, SKETCH12_H)
        with Locations((142.95, 3)):
            Rectangle(SKETCH12_W_2, SKETCH12_H_2, mode=Mode.SUBTRACT)
    extrude(amount=BOSS_EXTRUDE6_DEPTH)

    # Sketch13 → Boss-Extrude7 (add)
    with BuildSketch(Plane.XZ.offset(-10)):
        with Locations((142.95, -14.5)):
            Rectangle(SKETCH13_W, SKETCH13_H)
    extrude(amount=BOSS_EXTRUDE7_DEPTH)

    # Sketch14 → Cut-Extrude5 (cut)
    with BuildSketch(Plane.XZ.offset(-4)):
        with Locations((157.936884978, 16.074384573)):
            Rectangle(SKETCH14_W, SKETCH14_H)
        with Locations((143.337214565, 21.464137582)):
            Rectangle(SKETCH14_W_2, SKETCH14_H_2)
        with Locations((129.195604024, 2.873540073)):
            Rectangle(SKETCH14_W_3, SKETCH14_H_3)
    extrude(amount=-CUT_EXTRUDE5_DEPTH, mode=Mode.SUBTRACT)

    # Fillet7
    fillet7_edges = [part.edges().sort_by_distance(p)[0] for p in [
        (150.993645086, 7, 20.5),
        (135.680784043, 7, 20.5),
        (129.65, 7, 11.91502686),
        (156.25, 7, 8.124705415),
        (129.65, 7, -6.167946715),
    ]]
    fillet(fillet7_edges, radius=FILLET7_R - 0.0001)  # a hair under: the kernel refuses the full size

    # Sketch15 → Cut-Extrude6 (cut)
    with BuildSketch(Plane.XY.offset(-40.5)):
        with BuildLine():
            Line((142.732418969, 8.83308219), (145.68707631, 8.83308219))
            ThreePointArc((145.68707631, 8.83308219), (146.85974764, 6.63308219), (145.68707631, 4.43308219))
            Line((145.68707631, 4.43308219), (142.732418969, 4.43308219))
            ThreePointArc((142.732418969, 4.43308219), (141.55974764, 6.63308219), (142.732418969, 8.83308219))
        make_face()
    extrude(amount=-CUT_EXTRUDE6_DEPTH, mode=Mode.SUBTRACT)

    # Sketch16 → Cut-Extrude7 (cut)
    with BuildSketch(Plane(origin=(0, 0, 40.5), x_dir=(-1, 0, 0), z_dir=(0, 0, -1))):
        with BuildLine():
            Line((-146.114315764, 9.98869973), (-139.089315764, 9.98869973))
            ThreePointArc((-139.089315764, 9.98869973), (-134.714315764, 5.61369973), (-139.089315764, 1.23869973))
            Line((-139.089315764, 1.23869973), (-146.114315764, 1.23869973))
            Line((-146.114315764, 1.23869973), (-146.114315764, 5.61369973))
            Line((-146.114315764, 5.61369973), (-146.114315764, 9.98869973))
        make_face()
    extrude(amount=-CUT_EXTRUDE7_DEPTH, mode=Mode.SUBTRACT)

    # Sketch17 → Cut-Extrude8 (cut)
    with BuildSketch(Plane.XY.offset(44.5)):
        Polygon((136.623185341, 2), (146.114315764, 4.571516723), (146.114315764, -5.033546584), (136.623185341, -4.403350122), align=None)
    extrude(amount=-CUT_EXTRUDE8_DEPTH, mode=Mode.SUBTRACT)

    # Sketch19 → Boss-Extrude8 (add)
    with BuildSketch(Plane.XZ.offset(-10)):
        with Locations((48.241330984, -14.734055582)):
            Rectangle(SKETCH19_W, SKETCH19_H)
        with Locations((48.241330984, -14.734055582)):
            Rectangle(SKETCH19_W_2, SKETCH19_H_2, mode=Mode.SUBTRACT)
    extrude(amount=BOSS_EXTRUDE8_DEPTH)

    # Sketch20 → Cut-Extrude9 (cut)
    with BuildSketch(Plane.XZ.offset(-4)):
        with Locations((48.241330984, -27.384055582)):
            Rectangle(SKETCH20_W, SKETCH20_H)
    extrude(amount=-CUT_EXTRUDE9_DEPTH, mode=Mode.SUBTRACT)

    # Fillet8
    fillet8_edges = [part.edges().sort_by_distance(p)[0] for p in [
        (39.741330984, 7, -25.384055582),
        (56.741330984, 7, -25.384055582),
    ]]
    fillet(fillet8_edges, radius=FILLET8_R - 0.0001)  # a hair under: the kernel refuses the full size

    # Fillet9
    fillet9_edges = [part.edges().sort_by_distance(p)[0] for p in [
        (60.741330984, 7, -2.084055582),
        (35.741330984, 7, -2.084055582),
        (158.25, 7, -16.5),
        (127.65, 7, 22.5),
        (127.65, 7, -16.5),
    ]]
    fillet(fillet9_edges, radius=FILLET9_R)

    # Fillet10
    fillet10_edges = [part.edges().sort_by_distance(p)[0] for p in [
        (-16.25, 4, 0),
        (-16.25, 7, 0),
        (-14.25, 4, 0),
    ]]
    fillet(fillet10_edges, radius=FILLET10_R - 0.0001)  # a hair under: the kernel refuses the full size

    # Sketch18 → Cut-Extrude10 (cut, through all)
    with BuildSketch(Plane(origin=(0, 12, 0), x_dir=(1, 0, 0), z_dir=(0, 1, 0))):
        with Locations((-103.037190747, -3.596714528)):
            Rectangle(SKETCH18_W, SKETCH18_H)
    extrude(amount=-CUT_EXTRUDE10_DEPTH, mode=Mode.SUBTRACT)


solid = part.part
